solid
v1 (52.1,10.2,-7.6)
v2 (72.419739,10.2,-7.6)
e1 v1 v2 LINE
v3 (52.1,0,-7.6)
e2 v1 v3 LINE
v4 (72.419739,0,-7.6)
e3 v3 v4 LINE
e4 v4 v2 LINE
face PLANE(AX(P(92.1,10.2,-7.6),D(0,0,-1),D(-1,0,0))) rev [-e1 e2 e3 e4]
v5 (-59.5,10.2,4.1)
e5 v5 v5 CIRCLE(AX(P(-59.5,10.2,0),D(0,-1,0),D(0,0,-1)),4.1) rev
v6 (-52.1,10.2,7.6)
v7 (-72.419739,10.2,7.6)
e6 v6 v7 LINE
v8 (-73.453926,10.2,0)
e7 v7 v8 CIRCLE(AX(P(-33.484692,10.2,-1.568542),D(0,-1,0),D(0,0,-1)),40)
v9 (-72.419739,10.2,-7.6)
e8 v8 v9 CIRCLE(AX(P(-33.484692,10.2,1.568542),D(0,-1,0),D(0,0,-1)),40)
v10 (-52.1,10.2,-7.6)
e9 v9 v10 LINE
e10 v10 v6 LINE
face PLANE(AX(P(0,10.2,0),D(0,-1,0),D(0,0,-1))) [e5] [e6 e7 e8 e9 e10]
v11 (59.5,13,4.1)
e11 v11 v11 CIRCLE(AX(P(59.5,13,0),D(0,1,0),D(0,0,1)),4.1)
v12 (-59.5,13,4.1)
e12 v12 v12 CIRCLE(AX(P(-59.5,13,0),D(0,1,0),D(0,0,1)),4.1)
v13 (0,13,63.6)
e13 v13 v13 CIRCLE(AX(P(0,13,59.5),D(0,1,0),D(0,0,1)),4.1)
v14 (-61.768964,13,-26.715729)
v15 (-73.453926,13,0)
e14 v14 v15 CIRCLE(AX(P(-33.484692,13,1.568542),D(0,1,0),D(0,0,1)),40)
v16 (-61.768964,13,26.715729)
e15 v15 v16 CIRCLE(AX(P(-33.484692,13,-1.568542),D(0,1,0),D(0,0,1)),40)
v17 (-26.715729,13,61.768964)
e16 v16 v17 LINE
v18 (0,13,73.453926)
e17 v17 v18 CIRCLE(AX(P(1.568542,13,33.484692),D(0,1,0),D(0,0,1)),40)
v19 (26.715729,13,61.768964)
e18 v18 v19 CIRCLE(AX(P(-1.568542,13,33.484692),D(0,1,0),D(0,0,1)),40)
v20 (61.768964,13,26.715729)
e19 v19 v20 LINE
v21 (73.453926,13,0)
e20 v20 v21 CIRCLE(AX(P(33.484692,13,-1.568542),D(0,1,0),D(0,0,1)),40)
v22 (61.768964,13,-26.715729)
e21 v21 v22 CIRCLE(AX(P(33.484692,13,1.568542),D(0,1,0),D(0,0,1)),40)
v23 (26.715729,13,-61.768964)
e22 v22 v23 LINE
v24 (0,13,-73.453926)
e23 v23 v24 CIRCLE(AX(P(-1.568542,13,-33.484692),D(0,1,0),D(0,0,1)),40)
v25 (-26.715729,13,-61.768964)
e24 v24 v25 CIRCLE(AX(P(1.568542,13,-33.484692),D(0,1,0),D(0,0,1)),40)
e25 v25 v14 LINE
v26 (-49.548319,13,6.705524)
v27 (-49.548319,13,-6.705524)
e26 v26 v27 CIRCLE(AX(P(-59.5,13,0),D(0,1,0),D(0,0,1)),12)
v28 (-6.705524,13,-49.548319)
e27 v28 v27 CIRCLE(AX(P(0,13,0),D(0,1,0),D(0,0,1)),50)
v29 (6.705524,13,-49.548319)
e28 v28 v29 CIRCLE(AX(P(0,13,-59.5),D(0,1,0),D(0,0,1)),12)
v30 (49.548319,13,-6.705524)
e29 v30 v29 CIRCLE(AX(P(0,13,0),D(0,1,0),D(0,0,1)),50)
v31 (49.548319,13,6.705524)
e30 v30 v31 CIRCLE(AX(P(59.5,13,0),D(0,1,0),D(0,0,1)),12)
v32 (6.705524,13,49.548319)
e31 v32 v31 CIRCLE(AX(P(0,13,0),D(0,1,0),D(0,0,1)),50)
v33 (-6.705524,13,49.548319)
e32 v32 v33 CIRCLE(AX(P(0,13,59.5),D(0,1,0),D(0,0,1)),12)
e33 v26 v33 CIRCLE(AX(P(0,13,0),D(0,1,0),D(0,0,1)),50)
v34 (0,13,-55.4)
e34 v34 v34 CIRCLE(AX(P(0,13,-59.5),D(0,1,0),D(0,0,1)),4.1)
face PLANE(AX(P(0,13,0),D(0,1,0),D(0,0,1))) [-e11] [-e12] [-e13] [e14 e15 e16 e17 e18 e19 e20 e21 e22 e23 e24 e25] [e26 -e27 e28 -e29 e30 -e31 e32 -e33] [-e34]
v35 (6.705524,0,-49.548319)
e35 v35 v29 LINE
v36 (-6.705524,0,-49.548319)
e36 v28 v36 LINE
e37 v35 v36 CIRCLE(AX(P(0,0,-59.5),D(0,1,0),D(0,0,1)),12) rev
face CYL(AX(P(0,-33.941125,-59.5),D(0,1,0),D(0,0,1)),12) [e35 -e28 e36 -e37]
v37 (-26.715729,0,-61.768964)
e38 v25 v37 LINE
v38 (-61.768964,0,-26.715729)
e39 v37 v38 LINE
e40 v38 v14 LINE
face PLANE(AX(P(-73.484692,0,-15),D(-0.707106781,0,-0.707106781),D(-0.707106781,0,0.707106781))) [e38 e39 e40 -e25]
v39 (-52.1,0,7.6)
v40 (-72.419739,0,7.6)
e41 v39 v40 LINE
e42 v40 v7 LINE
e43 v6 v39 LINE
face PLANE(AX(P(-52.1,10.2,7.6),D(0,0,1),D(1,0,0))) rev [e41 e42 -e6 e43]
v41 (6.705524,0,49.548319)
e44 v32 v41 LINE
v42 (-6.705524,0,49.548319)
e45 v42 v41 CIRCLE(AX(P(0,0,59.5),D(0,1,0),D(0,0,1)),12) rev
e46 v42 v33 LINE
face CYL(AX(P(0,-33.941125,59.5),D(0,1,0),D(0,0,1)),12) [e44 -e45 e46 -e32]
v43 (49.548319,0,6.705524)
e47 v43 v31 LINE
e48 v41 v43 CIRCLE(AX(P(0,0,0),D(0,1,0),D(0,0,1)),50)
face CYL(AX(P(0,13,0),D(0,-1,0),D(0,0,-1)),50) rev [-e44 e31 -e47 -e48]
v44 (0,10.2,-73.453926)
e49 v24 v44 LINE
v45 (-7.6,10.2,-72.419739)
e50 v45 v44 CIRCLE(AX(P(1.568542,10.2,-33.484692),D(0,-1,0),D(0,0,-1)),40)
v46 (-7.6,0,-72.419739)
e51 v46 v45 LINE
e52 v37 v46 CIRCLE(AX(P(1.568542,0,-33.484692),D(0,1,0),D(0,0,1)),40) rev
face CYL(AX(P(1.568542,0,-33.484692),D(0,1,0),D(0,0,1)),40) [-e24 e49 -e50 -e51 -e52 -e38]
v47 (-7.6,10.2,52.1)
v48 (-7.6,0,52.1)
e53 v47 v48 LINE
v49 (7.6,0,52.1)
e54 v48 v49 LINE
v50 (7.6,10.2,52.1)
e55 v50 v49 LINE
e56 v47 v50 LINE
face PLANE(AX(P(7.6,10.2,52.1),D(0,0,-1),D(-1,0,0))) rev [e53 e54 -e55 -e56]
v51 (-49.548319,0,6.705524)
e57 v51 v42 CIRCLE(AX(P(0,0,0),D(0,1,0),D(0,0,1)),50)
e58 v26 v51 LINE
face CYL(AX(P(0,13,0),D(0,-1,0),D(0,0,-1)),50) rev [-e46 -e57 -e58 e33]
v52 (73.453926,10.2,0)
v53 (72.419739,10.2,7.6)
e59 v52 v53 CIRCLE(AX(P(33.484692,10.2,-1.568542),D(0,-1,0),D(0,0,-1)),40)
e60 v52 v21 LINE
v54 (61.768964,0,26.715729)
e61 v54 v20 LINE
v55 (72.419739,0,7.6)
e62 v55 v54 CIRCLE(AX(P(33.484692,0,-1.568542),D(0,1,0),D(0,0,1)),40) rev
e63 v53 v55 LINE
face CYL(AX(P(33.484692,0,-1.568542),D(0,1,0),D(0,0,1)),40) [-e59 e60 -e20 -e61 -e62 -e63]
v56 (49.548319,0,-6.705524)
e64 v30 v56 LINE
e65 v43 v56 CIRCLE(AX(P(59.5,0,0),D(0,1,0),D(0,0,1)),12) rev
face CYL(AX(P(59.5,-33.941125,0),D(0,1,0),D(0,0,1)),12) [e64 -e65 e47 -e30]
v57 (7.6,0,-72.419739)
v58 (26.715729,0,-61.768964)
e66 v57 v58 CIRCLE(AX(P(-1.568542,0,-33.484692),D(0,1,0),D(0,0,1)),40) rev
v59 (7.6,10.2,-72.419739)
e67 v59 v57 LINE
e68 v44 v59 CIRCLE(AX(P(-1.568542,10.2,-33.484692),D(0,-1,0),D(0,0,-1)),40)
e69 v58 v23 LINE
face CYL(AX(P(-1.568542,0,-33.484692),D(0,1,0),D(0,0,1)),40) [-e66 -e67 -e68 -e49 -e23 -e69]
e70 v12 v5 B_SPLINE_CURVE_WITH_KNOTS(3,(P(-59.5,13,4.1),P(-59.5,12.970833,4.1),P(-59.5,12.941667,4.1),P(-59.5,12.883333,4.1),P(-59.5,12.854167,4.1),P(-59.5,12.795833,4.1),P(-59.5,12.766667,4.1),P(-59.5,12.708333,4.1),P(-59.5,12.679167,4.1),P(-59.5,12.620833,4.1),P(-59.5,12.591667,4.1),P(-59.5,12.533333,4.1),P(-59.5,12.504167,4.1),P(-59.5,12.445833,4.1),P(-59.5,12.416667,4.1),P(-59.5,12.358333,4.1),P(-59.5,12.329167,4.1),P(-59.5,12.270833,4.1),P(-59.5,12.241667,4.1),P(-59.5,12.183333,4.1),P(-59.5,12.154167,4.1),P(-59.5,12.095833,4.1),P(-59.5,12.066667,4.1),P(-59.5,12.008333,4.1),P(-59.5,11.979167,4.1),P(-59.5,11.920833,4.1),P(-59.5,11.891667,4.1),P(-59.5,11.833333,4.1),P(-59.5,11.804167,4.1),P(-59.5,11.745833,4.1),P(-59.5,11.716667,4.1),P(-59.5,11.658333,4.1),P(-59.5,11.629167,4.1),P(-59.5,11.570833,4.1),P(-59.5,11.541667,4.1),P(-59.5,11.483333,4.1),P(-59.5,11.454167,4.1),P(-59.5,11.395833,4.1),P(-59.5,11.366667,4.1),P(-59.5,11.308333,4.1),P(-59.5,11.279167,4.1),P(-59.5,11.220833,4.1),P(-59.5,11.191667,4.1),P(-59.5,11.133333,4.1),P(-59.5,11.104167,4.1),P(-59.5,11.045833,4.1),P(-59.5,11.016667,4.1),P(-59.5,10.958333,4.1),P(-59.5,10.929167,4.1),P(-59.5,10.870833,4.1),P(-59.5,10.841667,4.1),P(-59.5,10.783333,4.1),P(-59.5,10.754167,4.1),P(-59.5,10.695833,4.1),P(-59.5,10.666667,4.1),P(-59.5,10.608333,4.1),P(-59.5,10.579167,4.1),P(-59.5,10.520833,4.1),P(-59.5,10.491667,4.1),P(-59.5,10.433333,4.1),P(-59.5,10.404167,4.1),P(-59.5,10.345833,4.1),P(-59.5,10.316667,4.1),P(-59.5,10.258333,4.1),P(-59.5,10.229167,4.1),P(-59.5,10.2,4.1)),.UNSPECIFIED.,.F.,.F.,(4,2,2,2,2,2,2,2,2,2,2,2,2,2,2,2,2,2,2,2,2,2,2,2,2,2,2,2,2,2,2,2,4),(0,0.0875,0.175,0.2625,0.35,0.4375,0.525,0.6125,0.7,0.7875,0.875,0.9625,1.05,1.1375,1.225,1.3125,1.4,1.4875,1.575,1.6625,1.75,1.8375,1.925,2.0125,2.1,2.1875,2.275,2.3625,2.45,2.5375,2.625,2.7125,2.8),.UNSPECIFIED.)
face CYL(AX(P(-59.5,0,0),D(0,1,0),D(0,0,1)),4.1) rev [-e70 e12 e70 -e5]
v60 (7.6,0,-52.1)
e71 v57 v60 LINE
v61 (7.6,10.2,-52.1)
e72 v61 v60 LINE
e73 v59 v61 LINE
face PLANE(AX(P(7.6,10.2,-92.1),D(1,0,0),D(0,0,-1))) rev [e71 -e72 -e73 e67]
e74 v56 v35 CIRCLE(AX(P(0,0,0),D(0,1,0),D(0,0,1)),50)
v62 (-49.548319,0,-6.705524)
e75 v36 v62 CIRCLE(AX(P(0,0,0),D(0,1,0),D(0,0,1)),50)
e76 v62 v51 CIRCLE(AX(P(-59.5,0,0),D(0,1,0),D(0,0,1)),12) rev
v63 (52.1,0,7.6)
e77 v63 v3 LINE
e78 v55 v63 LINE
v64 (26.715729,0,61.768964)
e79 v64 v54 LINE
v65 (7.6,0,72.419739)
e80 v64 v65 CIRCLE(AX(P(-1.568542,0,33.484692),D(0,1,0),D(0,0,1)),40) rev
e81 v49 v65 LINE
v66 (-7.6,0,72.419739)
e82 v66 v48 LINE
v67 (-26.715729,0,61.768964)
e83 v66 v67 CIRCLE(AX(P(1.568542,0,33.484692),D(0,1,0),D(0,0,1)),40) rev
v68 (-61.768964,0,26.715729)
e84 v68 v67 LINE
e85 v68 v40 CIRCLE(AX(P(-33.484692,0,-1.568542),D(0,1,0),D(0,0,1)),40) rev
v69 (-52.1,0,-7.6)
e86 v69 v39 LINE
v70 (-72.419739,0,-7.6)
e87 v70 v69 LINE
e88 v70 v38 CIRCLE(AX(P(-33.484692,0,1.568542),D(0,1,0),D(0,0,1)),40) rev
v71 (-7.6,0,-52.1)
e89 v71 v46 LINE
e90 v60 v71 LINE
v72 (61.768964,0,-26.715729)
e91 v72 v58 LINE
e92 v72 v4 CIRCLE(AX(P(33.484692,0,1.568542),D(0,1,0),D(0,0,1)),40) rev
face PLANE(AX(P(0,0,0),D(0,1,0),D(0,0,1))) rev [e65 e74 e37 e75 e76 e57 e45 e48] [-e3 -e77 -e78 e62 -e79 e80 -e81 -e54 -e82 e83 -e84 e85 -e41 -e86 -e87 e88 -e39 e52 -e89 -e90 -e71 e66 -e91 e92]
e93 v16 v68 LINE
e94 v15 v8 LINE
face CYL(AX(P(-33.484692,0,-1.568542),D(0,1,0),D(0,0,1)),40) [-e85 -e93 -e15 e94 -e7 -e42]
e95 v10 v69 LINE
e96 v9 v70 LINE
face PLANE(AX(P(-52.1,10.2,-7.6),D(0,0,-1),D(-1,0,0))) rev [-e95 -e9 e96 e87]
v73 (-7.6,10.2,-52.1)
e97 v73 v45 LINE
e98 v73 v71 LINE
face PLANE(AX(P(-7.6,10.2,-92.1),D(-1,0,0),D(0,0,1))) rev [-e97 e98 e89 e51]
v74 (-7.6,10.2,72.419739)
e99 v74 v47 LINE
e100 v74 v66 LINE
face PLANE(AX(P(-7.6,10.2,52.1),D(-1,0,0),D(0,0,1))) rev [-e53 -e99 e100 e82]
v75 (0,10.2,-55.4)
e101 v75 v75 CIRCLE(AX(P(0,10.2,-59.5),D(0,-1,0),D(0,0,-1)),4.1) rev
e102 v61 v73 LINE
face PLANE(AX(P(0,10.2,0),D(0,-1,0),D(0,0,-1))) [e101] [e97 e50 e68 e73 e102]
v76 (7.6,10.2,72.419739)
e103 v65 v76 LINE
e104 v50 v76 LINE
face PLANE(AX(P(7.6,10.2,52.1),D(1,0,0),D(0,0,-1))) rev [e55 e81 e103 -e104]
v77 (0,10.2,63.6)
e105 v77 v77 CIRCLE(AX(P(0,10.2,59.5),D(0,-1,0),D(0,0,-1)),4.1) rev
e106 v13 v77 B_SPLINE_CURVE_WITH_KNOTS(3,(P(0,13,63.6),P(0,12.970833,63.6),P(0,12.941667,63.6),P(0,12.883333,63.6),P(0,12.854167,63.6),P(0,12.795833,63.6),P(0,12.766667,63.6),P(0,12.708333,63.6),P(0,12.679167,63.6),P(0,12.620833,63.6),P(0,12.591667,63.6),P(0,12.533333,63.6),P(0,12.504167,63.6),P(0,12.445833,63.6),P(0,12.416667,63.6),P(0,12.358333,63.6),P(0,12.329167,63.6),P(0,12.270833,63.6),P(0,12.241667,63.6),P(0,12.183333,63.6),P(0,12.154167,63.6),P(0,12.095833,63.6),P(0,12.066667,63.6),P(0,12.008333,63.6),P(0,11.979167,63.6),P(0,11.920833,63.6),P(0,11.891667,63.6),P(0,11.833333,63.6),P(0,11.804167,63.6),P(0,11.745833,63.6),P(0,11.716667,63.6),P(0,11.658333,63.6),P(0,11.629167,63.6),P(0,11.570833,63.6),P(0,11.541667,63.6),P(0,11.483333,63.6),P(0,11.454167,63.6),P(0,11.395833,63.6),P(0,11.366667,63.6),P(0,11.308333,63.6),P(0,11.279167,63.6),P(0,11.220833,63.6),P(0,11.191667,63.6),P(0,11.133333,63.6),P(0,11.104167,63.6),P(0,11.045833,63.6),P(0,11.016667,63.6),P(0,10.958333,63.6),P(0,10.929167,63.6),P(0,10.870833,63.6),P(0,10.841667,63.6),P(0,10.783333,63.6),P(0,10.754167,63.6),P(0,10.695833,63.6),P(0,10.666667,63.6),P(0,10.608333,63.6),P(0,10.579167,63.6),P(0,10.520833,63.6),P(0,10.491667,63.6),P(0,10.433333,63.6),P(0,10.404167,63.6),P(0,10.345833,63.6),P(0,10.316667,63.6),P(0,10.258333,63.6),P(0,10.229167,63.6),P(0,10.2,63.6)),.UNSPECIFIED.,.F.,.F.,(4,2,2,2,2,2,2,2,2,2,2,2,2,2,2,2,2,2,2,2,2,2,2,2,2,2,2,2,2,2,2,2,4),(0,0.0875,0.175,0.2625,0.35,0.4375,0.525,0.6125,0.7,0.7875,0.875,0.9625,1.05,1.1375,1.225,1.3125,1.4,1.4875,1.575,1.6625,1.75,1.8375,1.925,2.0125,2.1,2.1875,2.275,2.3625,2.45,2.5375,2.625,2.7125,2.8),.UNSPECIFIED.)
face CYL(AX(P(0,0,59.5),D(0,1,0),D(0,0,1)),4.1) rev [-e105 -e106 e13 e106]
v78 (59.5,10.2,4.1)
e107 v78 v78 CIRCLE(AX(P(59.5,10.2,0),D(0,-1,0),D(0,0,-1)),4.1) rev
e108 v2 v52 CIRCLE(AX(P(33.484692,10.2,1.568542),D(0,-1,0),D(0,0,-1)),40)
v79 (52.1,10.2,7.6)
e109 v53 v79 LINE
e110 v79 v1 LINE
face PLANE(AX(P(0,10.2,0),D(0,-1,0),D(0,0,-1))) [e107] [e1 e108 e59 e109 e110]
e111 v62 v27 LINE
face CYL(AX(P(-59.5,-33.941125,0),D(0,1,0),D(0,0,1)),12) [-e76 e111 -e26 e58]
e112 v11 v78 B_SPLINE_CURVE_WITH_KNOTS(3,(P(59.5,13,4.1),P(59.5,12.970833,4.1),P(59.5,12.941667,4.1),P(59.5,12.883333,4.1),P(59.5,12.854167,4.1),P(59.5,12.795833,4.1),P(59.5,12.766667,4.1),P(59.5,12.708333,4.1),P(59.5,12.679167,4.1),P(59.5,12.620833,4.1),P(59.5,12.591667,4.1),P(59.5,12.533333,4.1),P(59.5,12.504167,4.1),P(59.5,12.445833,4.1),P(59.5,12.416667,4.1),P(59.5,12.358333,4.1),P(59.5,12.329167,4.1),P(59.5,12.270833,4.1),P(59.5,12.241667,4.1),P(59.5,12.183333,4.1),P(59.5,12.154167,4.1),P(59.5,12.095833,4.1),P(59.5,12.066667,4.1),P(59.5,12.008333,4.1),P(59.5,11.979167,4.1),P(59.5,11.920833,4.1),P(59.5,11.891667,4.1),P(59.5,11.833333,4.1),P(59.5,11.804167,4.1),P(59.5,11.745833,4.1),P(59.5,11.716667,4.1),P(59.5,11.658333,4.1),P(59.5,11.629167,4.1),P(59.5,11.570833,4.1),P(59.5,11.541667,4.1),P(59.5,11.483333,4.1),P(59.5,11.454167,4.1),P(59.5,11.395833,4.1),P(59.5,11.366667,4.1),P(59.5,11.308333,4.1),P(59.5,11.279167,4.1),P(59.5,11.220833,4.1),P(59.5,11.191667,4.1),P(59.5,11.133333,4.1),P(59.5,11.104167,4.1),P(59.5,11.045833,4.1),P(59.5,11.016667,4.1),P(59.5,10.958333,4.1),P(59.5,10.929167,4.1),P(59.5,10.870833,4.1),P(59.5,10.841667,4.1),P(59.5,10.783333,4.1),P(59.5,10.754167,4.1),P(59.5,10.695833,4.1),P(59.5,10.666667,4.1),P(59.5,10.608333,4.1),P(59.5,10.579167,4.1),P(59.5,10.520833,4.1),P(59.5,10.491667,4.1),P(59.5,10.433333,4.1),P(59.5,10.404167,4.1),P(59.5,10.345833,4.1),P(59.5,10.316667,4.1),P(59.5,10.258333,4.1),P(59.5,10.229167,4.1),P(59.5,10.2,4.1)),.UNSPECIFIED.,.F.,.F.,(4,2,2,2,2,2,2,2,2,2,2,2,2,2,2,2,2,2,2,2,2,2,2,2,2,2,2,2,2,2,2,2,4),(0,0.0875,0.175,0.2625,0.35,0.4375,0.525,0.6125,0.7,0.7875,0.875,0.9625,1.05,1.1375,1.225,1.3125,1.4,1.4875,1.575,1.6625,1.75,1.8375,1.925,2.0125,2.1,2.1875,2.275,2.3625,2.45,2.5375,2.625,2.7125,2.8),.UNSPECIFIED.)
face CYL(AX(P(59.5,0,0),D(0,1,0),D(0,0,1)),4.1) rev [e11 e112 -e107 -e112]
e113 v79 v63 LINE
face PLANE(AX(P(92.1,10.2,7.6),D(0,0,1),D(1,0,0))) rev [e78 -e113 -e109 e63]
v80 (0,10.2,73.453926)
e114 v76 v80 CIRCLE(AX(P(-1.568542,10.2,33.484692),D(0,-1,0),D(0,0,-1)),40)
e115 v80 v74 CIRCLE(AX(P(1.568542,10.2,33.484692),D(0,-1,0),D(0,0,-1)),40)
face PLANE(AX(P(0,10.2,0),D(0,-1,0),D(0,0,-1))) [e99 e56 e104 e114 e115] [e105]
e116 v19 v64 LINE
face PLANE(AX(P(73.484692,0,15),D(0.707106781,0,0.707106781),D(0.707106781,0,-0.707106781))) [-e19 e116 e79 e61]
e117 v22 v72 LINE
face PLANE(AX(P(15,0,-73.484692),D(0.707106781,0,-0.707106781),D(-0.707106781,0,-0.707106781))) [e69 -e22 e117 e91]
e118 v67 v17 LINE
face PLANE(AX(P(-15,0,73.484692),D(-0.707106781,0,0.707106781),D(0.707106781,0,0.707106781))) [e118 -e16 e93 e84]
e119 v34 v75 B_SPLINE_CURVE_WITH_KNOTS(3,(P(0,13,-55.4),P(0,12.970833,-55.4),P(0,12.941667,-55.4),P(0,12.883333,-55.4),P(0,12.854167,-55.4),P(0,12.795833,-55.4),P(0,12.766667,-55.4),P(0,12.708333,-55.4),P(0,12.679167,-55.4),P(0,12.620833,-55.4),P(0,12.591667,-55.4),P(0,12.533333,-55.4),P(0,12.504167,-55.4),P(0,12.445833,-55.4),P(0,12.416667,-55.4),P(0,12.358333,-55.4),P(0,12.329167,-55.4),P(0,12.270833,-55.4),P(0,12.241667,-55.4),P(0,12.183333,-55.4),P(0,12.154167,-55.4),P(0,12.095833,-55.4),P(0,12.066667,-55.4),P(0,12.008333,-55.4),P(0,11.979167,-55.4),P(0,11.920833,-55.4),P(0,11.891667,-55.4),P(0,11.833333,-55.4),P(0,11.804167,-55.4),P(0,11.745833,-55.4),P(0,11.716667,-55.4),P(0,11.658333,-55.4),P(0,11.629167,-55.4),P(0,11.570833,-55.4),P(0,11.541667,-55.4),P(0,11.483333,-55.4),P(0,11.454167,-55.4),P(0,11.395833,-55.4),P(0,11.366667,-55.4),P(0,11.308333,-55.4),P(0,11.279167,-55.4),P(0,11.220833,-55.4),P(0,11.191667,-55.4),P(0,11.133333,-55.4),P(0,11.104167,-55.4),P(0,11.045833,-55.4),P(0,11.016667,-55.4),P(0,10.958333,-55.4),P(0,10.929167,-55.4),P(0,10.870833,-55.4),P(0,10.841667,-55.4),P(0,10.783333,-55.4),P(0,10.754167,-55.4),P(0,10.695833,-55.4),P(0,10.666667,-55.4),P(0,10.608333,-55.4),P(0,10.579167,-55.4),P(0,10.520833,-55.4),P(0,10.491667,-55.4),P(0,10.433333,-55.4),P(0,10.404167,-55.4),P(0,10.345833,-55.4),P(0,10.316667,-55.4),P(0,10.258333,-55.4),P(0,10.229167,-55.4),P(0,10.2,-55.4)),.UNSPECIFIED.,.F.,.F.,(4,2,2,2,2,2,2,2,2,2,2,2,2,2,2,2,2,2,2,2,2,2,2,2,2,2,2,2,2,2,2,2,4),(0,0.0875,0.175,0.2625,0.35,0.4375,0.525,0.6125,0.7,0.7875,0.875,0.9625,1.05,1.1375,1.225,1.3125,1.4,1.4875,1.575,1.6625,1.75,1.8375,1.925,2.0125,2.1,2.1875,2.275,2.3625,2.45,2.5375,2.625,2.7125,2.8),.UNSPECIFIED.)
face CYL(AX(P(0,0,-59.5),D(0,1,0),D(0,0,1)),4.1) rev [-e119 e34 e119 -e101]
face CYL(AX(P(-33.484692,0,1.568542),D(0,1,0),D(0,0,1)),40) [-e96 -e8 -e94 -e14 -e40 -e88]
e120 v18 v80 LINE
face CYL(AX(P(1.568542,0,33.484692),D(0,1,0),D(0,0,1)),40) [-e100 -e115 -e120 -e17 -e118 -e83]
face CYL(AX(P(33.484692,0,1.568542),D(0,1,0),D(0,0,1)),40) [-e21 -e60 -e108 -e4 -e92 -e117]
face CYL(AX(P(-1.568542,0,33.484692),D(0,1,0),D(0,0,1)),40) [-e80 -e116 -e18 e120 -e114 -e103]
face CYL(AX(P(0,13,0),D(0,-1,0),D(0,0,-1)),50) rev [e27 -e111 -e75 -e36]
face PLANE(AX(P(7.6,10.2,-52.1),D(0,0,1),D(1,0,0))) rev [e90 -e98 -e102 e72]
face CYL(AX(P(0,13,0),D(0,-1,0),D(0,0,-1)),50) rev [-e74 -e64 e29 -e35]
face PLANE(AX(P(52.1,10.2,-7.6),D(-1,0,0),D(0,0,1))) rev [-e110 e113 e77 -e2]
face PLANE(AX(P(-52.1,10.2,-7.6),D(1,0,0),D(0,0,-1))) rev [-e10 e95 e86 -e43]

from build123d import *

# Parameters (mm, degrees)
SKETCH1_R           = 75
SKETCH1_R_2         = 50
BOSS_EXTRUDE1_DEPTH = 13
SKETCH2_R           = 4.1
CUT_EXTRUDE1_DEPTH  = 107.85972113
SKETCH8_R           = 12
SKETCH8_R_2         = 4.1
BOSS_EXTRUDE4_DEPTH = 13
SKETCH3_W           = 15.2
SKETCH3_H           = 40
SKETCH3_W_2         = 40
SKETCH3_H_2         = 15.2
CUT_EXTRUDE2_DEPTH  = 10.2
BOSS_EXTRUDE2_DEPTH = 13
FILLET1_R           = 30
SKETCH7_OUTSIDE_W   = 194.506
SKETCH7_OUTSIDE_H   = 194.506
CUT_EXTRUDE4_DEPTH  = 107.85972113
FILLET3_R           = 40


with BuildPart() as part:
    # Sketch1 → Boss-Extrude1 (new body)
    with BuildSketch(Plane(origin=(0, 0, 0), x_dir=(1, 0, 0), z_dir=(0, 1, 0))):
        with Locations(Location((0, 0, 0), (0, 0, 90))):
            Circle(SKETCH1_R)
        with Locations(Location((0, 0, 0), (0, 0, 90))):
            Circle(SKETCH1_R_2, mode=Mode.SUBTRACT)
    extrude(amount=BOSS_EXTRUDE1_DEPTH)

    # Sketch2 → Cut-Extrude1 (cut, through all)
    with BuildSketch(Plane(origin=(0, 13, 0), x_dir=(1, 0, 0), z_dir=(0, 1, 0))):
        with Locations(Location((0, 59.5, 0), (0, 0, 270))):
            Circle(SKETCH2_R)
        with Locations(Location((59.5, 0, 0), (0, 0, 270))):
            Circle(SKETCH2_R)
        with Locations(Location((0, -59.5, 0), (0, 0, 270))):
            Circle(SKETCH2_R)
        with Locations(Location((-59.5, 0, 0), (0, 0, 270))):
            Circle(SKETCH2_R)
    extrude(amount=-CUT_EXTRUDE1_DEPTH, mode=Mode.SUBTRACT)

    # Sketch8 → Boss-Extrude4 (add)
    # profile 1 of 4: a face of its own
    with BuildSketch(Plane(origin=(0, 13, 0), x_dir=(1, 0, 0), z_dir=(0, 1, 0))):
        with Locations((59.5, 0)):
            Circle(SKETCH8_R)
        with Locations(Location((59.5, 0, 0), (0, 0, 270))):
            Circle(SKETCH8_R_2, mode=Mode.SUBTRACT)
    # profile 2 of 4: a face of its own
    with BuildSketch(Plane(origin=(0, 13, 0), x_dir=(1, 0, 0), z_dir=(0, 1, 0))):
        with Locations((0, -59.5)):
            Circle(SKETCH8_R)
        with Locations(Location((0, -59.5, 0), (0, 0, 270))):
            Circle(SKETCH8_R_2, mode=Mode.SUBTRACT)
    # profile 3 of 4: a face of its own
    with BuildSketch(Plane(origin=(0, 13, 0), x_dir=(1, 0, 0), z_dir=(0, 1, 0))):
        with Locations((-59.5, 0)):
            Circle(SKETCH8_R)
        with Locations(Location((-59.5, 0, 0), (0, 0, 270))):
            Circle(SKETCH8_R_2, mode=Mode.SUBTRACT)
    # profile 4 of 4: a face of its own
    with BuildSketch(Plane(origin=(0, 13, 0), x_dir=(1, 0, 0), z_dir=(0, 1, 0))):
        with Locations((0, 59.5)):
            Circle(SKETCH8_R)
        with Locations(Location((0, 59.5, 0), (0, 0, 270))):
            Circle(SKETCH8_R_2, mode=Mode.SUBTRACT)
    extrude(amount=-BOSS_EXTRUDE4_DEPTH)

    # Sketch3 → Cut-Extrude2 (cut)
    with BuildSketch(Plane.XZ):
        with Locations((0, 72.1)):
            Rectangle(SKETCH3_W, SKETCH3_H)
        with Locations((72.1, 0)):
            Rectangle(SKETCH3_W_2, SKETCH3_H_2)
        with Locations((0, -72.1)):
            Rectangle(SKETCH3_W, SKETCH3_H)
        with Locations((-72.1, 0)):
            Rectangle(SKETCH3_W_2, SKETCH3_H_2)
    extrude(amount=-CUT_EXTRUDE2_DEPTH, mode=Mode.SUBTRACT)

    # Sketch4 → Boss-Extrude2 (add)
    with BuildSketch(Plane(origin=(0, 13, 0), x_dir=(1, 0, 0), z_dir=(0, 1, 0))):
        Polygon((-40.658639918, -65.40737726), (-65.40737726, -40.658639918), (-63.943497033, -39.194759691), (-39.194759691, -63.943497033), align=None)
    extrude(amount=-BOSS_EXTRUDE2_DEPTH)

    # Fillet1
    # the kernel refuses this fillet: 30 mm, written as the material it adds along each edge
    with BuildSketch(Plane(origin=(-63.943497033, 13, 39.194759691), x_dir=(-0.47318102872743373, 0, -0.8809652172773041), z_dir=(0, -1, 0))) as fillet1_piece_1:
        with BuildLine():
            CenterArc((10.253688675, -29.951285387), FILLET1_R, 93.265618259, 17.938271436)
            Line((-0.596947211, -1.982307914), (-0.813959928, -1.422928365))
            ThreePointArc((-0.813959928, -1.422928365), (-0.872989201, -0.818145778), (-0.574515596, 0.173008179))
            Line((-0.574515596, 0.173008179), (0.034178962, 0.599025708))
            ThreePointArc((0.034178962, 0.599025708), (4.272370281, 0.478213468), (8.5105616, 0.599025708))
            Line((8.5105616, 0.599025708), (8.544740562, 0))
        make_face()
    extrude(amount=13)
    with BuildSketch(Plane(origin=(-39.194759691, 13, 63.943497033), x_dir=(0.8809652172773019, 0, 0.47318102872743756), z_dir=(0, -1, 0))) as fillet1_piece_2:
        with BuildLine():
            CenterArc((10.253688675, 29.951285387), FILLET1_R, 248.796110305, 17.938271436)
            Line((-0.596947211, 1.982307914), (-0.813959928, 1.422928365))
            ThreePointArc((-0.813959928, 1.422928365), (-0.872989201, 0.818145778), (-0.574515596, -0.173008179))
            Line((-0.574515596, -0.173008179), (0.034178962, -0.599025708))
            ThreePointArc((0.034178962, -0.599025708), (4.272370281, -0.478213468), (8.5105616, -0.599025708))
            Line((8.5105616, -0.599025708), (8.544740562, 0))
        make_face()
    extrude(amount=13)

    # Sketch7 outside → Cut-Extrude4 (cut, through all)
    with BuildSketch(Plane(origin=(0, 13, 0), x_dir=(1, 0, 0), z_dir=(0, 1, 0))):
        Rectangle(SKETCH7_OUTSIDE_W, SKETCH7_OUTSIDE_H)
        Polygon((73.484692283, -15), (15, -73.484692283), (-15, -73.484692283), (-73.484692283, -15), (-73.484692283, 15), (-15, 73.484692283), (15, 73.484692283), (73.484692283, 15), align=None, mode=Mode.SUBTRACT)
    extrude(amount=-CUT_EXTRUDE4_DEPTH, mode=Mode.SUBTRACT)

    # Fillet3
    # the kernel refuses this fillet: 40 mm, written as the material it takes off along each edge
    with BuildSketch(Plane(origin=(15, 54.421356237, 73.484692283), x_dir=(-1, 0, 0), z_dir=(0, -1, 0)), Plane(origin=(73.484692283, 54.421356237, 15), x_dir=(-0.7071067811865474, 0, 0.7071067811865476), z_dir=(0, -1, 0))) as fillet3_piece_1:
        with BuildLine():
            CenterArc((FILLET3_R * 0.414213562373, FILLET3_R), FILLET3_R, 225, 45)
            Line((-FILLET3_R * 0.292893218813, FILLET3_R * 0.292893218813), (0, 0))
            Line((0, 0), (FILLET3_R * 0.414213562373, 0))
        make_face()
    extrude(amount=95.842712475, mode=Mode.SUBTRACT)
    with BuildSketch(Plane(origin=(-15, 54.421356237, 73.484692283), x_dir=(1, 0, 0), z_dir=(0, -1, 0)), Plane(origin=(-73.484692283, 54.421356237, 15), x_dir=(0.7071067811865477, 0, 0.7071067811865472), z_dir=(0, -1, 0)), Plane(origin=(-73.484692283, 54.421356237, -15), x_dir=(0, 0, 1), z_dir=(0, -1, 0)), Plane(origin=(-15, 54.421356237, -73.484692283), x_dir=(-0.7071067811865472, 0, 0.7071067811865477), z_dir=(0, -1, 0)), Plane(origin=(15, 54.421356237, -73.484692283), x_dir=(-1, 0, 0), z_dir=(0, -1, 0)), Plane(origin=(73.484692283, 54.421356237, -15), x_dir=(-0.7071067811865477, 0, -0.7071067811865472), z_dir=(0, -1, 0))) as fillet3_piece_2:
        with BuildLine():
            CenterArc((FILLET3_R * 0.414213562373, -FILLET3_R), FILLET3_R, 90, 45)
            Line((-FILLET3_R * 0.292893218813, -FILLET3_R * 0.292893218813), (0, 0))
            Line((0, 0), (FILLET3_R * 0.414213562373, 0))
        make_face()
    extrude(amount=95.842712475, mode=Mode.SUBTRACT)


solid = part.part
